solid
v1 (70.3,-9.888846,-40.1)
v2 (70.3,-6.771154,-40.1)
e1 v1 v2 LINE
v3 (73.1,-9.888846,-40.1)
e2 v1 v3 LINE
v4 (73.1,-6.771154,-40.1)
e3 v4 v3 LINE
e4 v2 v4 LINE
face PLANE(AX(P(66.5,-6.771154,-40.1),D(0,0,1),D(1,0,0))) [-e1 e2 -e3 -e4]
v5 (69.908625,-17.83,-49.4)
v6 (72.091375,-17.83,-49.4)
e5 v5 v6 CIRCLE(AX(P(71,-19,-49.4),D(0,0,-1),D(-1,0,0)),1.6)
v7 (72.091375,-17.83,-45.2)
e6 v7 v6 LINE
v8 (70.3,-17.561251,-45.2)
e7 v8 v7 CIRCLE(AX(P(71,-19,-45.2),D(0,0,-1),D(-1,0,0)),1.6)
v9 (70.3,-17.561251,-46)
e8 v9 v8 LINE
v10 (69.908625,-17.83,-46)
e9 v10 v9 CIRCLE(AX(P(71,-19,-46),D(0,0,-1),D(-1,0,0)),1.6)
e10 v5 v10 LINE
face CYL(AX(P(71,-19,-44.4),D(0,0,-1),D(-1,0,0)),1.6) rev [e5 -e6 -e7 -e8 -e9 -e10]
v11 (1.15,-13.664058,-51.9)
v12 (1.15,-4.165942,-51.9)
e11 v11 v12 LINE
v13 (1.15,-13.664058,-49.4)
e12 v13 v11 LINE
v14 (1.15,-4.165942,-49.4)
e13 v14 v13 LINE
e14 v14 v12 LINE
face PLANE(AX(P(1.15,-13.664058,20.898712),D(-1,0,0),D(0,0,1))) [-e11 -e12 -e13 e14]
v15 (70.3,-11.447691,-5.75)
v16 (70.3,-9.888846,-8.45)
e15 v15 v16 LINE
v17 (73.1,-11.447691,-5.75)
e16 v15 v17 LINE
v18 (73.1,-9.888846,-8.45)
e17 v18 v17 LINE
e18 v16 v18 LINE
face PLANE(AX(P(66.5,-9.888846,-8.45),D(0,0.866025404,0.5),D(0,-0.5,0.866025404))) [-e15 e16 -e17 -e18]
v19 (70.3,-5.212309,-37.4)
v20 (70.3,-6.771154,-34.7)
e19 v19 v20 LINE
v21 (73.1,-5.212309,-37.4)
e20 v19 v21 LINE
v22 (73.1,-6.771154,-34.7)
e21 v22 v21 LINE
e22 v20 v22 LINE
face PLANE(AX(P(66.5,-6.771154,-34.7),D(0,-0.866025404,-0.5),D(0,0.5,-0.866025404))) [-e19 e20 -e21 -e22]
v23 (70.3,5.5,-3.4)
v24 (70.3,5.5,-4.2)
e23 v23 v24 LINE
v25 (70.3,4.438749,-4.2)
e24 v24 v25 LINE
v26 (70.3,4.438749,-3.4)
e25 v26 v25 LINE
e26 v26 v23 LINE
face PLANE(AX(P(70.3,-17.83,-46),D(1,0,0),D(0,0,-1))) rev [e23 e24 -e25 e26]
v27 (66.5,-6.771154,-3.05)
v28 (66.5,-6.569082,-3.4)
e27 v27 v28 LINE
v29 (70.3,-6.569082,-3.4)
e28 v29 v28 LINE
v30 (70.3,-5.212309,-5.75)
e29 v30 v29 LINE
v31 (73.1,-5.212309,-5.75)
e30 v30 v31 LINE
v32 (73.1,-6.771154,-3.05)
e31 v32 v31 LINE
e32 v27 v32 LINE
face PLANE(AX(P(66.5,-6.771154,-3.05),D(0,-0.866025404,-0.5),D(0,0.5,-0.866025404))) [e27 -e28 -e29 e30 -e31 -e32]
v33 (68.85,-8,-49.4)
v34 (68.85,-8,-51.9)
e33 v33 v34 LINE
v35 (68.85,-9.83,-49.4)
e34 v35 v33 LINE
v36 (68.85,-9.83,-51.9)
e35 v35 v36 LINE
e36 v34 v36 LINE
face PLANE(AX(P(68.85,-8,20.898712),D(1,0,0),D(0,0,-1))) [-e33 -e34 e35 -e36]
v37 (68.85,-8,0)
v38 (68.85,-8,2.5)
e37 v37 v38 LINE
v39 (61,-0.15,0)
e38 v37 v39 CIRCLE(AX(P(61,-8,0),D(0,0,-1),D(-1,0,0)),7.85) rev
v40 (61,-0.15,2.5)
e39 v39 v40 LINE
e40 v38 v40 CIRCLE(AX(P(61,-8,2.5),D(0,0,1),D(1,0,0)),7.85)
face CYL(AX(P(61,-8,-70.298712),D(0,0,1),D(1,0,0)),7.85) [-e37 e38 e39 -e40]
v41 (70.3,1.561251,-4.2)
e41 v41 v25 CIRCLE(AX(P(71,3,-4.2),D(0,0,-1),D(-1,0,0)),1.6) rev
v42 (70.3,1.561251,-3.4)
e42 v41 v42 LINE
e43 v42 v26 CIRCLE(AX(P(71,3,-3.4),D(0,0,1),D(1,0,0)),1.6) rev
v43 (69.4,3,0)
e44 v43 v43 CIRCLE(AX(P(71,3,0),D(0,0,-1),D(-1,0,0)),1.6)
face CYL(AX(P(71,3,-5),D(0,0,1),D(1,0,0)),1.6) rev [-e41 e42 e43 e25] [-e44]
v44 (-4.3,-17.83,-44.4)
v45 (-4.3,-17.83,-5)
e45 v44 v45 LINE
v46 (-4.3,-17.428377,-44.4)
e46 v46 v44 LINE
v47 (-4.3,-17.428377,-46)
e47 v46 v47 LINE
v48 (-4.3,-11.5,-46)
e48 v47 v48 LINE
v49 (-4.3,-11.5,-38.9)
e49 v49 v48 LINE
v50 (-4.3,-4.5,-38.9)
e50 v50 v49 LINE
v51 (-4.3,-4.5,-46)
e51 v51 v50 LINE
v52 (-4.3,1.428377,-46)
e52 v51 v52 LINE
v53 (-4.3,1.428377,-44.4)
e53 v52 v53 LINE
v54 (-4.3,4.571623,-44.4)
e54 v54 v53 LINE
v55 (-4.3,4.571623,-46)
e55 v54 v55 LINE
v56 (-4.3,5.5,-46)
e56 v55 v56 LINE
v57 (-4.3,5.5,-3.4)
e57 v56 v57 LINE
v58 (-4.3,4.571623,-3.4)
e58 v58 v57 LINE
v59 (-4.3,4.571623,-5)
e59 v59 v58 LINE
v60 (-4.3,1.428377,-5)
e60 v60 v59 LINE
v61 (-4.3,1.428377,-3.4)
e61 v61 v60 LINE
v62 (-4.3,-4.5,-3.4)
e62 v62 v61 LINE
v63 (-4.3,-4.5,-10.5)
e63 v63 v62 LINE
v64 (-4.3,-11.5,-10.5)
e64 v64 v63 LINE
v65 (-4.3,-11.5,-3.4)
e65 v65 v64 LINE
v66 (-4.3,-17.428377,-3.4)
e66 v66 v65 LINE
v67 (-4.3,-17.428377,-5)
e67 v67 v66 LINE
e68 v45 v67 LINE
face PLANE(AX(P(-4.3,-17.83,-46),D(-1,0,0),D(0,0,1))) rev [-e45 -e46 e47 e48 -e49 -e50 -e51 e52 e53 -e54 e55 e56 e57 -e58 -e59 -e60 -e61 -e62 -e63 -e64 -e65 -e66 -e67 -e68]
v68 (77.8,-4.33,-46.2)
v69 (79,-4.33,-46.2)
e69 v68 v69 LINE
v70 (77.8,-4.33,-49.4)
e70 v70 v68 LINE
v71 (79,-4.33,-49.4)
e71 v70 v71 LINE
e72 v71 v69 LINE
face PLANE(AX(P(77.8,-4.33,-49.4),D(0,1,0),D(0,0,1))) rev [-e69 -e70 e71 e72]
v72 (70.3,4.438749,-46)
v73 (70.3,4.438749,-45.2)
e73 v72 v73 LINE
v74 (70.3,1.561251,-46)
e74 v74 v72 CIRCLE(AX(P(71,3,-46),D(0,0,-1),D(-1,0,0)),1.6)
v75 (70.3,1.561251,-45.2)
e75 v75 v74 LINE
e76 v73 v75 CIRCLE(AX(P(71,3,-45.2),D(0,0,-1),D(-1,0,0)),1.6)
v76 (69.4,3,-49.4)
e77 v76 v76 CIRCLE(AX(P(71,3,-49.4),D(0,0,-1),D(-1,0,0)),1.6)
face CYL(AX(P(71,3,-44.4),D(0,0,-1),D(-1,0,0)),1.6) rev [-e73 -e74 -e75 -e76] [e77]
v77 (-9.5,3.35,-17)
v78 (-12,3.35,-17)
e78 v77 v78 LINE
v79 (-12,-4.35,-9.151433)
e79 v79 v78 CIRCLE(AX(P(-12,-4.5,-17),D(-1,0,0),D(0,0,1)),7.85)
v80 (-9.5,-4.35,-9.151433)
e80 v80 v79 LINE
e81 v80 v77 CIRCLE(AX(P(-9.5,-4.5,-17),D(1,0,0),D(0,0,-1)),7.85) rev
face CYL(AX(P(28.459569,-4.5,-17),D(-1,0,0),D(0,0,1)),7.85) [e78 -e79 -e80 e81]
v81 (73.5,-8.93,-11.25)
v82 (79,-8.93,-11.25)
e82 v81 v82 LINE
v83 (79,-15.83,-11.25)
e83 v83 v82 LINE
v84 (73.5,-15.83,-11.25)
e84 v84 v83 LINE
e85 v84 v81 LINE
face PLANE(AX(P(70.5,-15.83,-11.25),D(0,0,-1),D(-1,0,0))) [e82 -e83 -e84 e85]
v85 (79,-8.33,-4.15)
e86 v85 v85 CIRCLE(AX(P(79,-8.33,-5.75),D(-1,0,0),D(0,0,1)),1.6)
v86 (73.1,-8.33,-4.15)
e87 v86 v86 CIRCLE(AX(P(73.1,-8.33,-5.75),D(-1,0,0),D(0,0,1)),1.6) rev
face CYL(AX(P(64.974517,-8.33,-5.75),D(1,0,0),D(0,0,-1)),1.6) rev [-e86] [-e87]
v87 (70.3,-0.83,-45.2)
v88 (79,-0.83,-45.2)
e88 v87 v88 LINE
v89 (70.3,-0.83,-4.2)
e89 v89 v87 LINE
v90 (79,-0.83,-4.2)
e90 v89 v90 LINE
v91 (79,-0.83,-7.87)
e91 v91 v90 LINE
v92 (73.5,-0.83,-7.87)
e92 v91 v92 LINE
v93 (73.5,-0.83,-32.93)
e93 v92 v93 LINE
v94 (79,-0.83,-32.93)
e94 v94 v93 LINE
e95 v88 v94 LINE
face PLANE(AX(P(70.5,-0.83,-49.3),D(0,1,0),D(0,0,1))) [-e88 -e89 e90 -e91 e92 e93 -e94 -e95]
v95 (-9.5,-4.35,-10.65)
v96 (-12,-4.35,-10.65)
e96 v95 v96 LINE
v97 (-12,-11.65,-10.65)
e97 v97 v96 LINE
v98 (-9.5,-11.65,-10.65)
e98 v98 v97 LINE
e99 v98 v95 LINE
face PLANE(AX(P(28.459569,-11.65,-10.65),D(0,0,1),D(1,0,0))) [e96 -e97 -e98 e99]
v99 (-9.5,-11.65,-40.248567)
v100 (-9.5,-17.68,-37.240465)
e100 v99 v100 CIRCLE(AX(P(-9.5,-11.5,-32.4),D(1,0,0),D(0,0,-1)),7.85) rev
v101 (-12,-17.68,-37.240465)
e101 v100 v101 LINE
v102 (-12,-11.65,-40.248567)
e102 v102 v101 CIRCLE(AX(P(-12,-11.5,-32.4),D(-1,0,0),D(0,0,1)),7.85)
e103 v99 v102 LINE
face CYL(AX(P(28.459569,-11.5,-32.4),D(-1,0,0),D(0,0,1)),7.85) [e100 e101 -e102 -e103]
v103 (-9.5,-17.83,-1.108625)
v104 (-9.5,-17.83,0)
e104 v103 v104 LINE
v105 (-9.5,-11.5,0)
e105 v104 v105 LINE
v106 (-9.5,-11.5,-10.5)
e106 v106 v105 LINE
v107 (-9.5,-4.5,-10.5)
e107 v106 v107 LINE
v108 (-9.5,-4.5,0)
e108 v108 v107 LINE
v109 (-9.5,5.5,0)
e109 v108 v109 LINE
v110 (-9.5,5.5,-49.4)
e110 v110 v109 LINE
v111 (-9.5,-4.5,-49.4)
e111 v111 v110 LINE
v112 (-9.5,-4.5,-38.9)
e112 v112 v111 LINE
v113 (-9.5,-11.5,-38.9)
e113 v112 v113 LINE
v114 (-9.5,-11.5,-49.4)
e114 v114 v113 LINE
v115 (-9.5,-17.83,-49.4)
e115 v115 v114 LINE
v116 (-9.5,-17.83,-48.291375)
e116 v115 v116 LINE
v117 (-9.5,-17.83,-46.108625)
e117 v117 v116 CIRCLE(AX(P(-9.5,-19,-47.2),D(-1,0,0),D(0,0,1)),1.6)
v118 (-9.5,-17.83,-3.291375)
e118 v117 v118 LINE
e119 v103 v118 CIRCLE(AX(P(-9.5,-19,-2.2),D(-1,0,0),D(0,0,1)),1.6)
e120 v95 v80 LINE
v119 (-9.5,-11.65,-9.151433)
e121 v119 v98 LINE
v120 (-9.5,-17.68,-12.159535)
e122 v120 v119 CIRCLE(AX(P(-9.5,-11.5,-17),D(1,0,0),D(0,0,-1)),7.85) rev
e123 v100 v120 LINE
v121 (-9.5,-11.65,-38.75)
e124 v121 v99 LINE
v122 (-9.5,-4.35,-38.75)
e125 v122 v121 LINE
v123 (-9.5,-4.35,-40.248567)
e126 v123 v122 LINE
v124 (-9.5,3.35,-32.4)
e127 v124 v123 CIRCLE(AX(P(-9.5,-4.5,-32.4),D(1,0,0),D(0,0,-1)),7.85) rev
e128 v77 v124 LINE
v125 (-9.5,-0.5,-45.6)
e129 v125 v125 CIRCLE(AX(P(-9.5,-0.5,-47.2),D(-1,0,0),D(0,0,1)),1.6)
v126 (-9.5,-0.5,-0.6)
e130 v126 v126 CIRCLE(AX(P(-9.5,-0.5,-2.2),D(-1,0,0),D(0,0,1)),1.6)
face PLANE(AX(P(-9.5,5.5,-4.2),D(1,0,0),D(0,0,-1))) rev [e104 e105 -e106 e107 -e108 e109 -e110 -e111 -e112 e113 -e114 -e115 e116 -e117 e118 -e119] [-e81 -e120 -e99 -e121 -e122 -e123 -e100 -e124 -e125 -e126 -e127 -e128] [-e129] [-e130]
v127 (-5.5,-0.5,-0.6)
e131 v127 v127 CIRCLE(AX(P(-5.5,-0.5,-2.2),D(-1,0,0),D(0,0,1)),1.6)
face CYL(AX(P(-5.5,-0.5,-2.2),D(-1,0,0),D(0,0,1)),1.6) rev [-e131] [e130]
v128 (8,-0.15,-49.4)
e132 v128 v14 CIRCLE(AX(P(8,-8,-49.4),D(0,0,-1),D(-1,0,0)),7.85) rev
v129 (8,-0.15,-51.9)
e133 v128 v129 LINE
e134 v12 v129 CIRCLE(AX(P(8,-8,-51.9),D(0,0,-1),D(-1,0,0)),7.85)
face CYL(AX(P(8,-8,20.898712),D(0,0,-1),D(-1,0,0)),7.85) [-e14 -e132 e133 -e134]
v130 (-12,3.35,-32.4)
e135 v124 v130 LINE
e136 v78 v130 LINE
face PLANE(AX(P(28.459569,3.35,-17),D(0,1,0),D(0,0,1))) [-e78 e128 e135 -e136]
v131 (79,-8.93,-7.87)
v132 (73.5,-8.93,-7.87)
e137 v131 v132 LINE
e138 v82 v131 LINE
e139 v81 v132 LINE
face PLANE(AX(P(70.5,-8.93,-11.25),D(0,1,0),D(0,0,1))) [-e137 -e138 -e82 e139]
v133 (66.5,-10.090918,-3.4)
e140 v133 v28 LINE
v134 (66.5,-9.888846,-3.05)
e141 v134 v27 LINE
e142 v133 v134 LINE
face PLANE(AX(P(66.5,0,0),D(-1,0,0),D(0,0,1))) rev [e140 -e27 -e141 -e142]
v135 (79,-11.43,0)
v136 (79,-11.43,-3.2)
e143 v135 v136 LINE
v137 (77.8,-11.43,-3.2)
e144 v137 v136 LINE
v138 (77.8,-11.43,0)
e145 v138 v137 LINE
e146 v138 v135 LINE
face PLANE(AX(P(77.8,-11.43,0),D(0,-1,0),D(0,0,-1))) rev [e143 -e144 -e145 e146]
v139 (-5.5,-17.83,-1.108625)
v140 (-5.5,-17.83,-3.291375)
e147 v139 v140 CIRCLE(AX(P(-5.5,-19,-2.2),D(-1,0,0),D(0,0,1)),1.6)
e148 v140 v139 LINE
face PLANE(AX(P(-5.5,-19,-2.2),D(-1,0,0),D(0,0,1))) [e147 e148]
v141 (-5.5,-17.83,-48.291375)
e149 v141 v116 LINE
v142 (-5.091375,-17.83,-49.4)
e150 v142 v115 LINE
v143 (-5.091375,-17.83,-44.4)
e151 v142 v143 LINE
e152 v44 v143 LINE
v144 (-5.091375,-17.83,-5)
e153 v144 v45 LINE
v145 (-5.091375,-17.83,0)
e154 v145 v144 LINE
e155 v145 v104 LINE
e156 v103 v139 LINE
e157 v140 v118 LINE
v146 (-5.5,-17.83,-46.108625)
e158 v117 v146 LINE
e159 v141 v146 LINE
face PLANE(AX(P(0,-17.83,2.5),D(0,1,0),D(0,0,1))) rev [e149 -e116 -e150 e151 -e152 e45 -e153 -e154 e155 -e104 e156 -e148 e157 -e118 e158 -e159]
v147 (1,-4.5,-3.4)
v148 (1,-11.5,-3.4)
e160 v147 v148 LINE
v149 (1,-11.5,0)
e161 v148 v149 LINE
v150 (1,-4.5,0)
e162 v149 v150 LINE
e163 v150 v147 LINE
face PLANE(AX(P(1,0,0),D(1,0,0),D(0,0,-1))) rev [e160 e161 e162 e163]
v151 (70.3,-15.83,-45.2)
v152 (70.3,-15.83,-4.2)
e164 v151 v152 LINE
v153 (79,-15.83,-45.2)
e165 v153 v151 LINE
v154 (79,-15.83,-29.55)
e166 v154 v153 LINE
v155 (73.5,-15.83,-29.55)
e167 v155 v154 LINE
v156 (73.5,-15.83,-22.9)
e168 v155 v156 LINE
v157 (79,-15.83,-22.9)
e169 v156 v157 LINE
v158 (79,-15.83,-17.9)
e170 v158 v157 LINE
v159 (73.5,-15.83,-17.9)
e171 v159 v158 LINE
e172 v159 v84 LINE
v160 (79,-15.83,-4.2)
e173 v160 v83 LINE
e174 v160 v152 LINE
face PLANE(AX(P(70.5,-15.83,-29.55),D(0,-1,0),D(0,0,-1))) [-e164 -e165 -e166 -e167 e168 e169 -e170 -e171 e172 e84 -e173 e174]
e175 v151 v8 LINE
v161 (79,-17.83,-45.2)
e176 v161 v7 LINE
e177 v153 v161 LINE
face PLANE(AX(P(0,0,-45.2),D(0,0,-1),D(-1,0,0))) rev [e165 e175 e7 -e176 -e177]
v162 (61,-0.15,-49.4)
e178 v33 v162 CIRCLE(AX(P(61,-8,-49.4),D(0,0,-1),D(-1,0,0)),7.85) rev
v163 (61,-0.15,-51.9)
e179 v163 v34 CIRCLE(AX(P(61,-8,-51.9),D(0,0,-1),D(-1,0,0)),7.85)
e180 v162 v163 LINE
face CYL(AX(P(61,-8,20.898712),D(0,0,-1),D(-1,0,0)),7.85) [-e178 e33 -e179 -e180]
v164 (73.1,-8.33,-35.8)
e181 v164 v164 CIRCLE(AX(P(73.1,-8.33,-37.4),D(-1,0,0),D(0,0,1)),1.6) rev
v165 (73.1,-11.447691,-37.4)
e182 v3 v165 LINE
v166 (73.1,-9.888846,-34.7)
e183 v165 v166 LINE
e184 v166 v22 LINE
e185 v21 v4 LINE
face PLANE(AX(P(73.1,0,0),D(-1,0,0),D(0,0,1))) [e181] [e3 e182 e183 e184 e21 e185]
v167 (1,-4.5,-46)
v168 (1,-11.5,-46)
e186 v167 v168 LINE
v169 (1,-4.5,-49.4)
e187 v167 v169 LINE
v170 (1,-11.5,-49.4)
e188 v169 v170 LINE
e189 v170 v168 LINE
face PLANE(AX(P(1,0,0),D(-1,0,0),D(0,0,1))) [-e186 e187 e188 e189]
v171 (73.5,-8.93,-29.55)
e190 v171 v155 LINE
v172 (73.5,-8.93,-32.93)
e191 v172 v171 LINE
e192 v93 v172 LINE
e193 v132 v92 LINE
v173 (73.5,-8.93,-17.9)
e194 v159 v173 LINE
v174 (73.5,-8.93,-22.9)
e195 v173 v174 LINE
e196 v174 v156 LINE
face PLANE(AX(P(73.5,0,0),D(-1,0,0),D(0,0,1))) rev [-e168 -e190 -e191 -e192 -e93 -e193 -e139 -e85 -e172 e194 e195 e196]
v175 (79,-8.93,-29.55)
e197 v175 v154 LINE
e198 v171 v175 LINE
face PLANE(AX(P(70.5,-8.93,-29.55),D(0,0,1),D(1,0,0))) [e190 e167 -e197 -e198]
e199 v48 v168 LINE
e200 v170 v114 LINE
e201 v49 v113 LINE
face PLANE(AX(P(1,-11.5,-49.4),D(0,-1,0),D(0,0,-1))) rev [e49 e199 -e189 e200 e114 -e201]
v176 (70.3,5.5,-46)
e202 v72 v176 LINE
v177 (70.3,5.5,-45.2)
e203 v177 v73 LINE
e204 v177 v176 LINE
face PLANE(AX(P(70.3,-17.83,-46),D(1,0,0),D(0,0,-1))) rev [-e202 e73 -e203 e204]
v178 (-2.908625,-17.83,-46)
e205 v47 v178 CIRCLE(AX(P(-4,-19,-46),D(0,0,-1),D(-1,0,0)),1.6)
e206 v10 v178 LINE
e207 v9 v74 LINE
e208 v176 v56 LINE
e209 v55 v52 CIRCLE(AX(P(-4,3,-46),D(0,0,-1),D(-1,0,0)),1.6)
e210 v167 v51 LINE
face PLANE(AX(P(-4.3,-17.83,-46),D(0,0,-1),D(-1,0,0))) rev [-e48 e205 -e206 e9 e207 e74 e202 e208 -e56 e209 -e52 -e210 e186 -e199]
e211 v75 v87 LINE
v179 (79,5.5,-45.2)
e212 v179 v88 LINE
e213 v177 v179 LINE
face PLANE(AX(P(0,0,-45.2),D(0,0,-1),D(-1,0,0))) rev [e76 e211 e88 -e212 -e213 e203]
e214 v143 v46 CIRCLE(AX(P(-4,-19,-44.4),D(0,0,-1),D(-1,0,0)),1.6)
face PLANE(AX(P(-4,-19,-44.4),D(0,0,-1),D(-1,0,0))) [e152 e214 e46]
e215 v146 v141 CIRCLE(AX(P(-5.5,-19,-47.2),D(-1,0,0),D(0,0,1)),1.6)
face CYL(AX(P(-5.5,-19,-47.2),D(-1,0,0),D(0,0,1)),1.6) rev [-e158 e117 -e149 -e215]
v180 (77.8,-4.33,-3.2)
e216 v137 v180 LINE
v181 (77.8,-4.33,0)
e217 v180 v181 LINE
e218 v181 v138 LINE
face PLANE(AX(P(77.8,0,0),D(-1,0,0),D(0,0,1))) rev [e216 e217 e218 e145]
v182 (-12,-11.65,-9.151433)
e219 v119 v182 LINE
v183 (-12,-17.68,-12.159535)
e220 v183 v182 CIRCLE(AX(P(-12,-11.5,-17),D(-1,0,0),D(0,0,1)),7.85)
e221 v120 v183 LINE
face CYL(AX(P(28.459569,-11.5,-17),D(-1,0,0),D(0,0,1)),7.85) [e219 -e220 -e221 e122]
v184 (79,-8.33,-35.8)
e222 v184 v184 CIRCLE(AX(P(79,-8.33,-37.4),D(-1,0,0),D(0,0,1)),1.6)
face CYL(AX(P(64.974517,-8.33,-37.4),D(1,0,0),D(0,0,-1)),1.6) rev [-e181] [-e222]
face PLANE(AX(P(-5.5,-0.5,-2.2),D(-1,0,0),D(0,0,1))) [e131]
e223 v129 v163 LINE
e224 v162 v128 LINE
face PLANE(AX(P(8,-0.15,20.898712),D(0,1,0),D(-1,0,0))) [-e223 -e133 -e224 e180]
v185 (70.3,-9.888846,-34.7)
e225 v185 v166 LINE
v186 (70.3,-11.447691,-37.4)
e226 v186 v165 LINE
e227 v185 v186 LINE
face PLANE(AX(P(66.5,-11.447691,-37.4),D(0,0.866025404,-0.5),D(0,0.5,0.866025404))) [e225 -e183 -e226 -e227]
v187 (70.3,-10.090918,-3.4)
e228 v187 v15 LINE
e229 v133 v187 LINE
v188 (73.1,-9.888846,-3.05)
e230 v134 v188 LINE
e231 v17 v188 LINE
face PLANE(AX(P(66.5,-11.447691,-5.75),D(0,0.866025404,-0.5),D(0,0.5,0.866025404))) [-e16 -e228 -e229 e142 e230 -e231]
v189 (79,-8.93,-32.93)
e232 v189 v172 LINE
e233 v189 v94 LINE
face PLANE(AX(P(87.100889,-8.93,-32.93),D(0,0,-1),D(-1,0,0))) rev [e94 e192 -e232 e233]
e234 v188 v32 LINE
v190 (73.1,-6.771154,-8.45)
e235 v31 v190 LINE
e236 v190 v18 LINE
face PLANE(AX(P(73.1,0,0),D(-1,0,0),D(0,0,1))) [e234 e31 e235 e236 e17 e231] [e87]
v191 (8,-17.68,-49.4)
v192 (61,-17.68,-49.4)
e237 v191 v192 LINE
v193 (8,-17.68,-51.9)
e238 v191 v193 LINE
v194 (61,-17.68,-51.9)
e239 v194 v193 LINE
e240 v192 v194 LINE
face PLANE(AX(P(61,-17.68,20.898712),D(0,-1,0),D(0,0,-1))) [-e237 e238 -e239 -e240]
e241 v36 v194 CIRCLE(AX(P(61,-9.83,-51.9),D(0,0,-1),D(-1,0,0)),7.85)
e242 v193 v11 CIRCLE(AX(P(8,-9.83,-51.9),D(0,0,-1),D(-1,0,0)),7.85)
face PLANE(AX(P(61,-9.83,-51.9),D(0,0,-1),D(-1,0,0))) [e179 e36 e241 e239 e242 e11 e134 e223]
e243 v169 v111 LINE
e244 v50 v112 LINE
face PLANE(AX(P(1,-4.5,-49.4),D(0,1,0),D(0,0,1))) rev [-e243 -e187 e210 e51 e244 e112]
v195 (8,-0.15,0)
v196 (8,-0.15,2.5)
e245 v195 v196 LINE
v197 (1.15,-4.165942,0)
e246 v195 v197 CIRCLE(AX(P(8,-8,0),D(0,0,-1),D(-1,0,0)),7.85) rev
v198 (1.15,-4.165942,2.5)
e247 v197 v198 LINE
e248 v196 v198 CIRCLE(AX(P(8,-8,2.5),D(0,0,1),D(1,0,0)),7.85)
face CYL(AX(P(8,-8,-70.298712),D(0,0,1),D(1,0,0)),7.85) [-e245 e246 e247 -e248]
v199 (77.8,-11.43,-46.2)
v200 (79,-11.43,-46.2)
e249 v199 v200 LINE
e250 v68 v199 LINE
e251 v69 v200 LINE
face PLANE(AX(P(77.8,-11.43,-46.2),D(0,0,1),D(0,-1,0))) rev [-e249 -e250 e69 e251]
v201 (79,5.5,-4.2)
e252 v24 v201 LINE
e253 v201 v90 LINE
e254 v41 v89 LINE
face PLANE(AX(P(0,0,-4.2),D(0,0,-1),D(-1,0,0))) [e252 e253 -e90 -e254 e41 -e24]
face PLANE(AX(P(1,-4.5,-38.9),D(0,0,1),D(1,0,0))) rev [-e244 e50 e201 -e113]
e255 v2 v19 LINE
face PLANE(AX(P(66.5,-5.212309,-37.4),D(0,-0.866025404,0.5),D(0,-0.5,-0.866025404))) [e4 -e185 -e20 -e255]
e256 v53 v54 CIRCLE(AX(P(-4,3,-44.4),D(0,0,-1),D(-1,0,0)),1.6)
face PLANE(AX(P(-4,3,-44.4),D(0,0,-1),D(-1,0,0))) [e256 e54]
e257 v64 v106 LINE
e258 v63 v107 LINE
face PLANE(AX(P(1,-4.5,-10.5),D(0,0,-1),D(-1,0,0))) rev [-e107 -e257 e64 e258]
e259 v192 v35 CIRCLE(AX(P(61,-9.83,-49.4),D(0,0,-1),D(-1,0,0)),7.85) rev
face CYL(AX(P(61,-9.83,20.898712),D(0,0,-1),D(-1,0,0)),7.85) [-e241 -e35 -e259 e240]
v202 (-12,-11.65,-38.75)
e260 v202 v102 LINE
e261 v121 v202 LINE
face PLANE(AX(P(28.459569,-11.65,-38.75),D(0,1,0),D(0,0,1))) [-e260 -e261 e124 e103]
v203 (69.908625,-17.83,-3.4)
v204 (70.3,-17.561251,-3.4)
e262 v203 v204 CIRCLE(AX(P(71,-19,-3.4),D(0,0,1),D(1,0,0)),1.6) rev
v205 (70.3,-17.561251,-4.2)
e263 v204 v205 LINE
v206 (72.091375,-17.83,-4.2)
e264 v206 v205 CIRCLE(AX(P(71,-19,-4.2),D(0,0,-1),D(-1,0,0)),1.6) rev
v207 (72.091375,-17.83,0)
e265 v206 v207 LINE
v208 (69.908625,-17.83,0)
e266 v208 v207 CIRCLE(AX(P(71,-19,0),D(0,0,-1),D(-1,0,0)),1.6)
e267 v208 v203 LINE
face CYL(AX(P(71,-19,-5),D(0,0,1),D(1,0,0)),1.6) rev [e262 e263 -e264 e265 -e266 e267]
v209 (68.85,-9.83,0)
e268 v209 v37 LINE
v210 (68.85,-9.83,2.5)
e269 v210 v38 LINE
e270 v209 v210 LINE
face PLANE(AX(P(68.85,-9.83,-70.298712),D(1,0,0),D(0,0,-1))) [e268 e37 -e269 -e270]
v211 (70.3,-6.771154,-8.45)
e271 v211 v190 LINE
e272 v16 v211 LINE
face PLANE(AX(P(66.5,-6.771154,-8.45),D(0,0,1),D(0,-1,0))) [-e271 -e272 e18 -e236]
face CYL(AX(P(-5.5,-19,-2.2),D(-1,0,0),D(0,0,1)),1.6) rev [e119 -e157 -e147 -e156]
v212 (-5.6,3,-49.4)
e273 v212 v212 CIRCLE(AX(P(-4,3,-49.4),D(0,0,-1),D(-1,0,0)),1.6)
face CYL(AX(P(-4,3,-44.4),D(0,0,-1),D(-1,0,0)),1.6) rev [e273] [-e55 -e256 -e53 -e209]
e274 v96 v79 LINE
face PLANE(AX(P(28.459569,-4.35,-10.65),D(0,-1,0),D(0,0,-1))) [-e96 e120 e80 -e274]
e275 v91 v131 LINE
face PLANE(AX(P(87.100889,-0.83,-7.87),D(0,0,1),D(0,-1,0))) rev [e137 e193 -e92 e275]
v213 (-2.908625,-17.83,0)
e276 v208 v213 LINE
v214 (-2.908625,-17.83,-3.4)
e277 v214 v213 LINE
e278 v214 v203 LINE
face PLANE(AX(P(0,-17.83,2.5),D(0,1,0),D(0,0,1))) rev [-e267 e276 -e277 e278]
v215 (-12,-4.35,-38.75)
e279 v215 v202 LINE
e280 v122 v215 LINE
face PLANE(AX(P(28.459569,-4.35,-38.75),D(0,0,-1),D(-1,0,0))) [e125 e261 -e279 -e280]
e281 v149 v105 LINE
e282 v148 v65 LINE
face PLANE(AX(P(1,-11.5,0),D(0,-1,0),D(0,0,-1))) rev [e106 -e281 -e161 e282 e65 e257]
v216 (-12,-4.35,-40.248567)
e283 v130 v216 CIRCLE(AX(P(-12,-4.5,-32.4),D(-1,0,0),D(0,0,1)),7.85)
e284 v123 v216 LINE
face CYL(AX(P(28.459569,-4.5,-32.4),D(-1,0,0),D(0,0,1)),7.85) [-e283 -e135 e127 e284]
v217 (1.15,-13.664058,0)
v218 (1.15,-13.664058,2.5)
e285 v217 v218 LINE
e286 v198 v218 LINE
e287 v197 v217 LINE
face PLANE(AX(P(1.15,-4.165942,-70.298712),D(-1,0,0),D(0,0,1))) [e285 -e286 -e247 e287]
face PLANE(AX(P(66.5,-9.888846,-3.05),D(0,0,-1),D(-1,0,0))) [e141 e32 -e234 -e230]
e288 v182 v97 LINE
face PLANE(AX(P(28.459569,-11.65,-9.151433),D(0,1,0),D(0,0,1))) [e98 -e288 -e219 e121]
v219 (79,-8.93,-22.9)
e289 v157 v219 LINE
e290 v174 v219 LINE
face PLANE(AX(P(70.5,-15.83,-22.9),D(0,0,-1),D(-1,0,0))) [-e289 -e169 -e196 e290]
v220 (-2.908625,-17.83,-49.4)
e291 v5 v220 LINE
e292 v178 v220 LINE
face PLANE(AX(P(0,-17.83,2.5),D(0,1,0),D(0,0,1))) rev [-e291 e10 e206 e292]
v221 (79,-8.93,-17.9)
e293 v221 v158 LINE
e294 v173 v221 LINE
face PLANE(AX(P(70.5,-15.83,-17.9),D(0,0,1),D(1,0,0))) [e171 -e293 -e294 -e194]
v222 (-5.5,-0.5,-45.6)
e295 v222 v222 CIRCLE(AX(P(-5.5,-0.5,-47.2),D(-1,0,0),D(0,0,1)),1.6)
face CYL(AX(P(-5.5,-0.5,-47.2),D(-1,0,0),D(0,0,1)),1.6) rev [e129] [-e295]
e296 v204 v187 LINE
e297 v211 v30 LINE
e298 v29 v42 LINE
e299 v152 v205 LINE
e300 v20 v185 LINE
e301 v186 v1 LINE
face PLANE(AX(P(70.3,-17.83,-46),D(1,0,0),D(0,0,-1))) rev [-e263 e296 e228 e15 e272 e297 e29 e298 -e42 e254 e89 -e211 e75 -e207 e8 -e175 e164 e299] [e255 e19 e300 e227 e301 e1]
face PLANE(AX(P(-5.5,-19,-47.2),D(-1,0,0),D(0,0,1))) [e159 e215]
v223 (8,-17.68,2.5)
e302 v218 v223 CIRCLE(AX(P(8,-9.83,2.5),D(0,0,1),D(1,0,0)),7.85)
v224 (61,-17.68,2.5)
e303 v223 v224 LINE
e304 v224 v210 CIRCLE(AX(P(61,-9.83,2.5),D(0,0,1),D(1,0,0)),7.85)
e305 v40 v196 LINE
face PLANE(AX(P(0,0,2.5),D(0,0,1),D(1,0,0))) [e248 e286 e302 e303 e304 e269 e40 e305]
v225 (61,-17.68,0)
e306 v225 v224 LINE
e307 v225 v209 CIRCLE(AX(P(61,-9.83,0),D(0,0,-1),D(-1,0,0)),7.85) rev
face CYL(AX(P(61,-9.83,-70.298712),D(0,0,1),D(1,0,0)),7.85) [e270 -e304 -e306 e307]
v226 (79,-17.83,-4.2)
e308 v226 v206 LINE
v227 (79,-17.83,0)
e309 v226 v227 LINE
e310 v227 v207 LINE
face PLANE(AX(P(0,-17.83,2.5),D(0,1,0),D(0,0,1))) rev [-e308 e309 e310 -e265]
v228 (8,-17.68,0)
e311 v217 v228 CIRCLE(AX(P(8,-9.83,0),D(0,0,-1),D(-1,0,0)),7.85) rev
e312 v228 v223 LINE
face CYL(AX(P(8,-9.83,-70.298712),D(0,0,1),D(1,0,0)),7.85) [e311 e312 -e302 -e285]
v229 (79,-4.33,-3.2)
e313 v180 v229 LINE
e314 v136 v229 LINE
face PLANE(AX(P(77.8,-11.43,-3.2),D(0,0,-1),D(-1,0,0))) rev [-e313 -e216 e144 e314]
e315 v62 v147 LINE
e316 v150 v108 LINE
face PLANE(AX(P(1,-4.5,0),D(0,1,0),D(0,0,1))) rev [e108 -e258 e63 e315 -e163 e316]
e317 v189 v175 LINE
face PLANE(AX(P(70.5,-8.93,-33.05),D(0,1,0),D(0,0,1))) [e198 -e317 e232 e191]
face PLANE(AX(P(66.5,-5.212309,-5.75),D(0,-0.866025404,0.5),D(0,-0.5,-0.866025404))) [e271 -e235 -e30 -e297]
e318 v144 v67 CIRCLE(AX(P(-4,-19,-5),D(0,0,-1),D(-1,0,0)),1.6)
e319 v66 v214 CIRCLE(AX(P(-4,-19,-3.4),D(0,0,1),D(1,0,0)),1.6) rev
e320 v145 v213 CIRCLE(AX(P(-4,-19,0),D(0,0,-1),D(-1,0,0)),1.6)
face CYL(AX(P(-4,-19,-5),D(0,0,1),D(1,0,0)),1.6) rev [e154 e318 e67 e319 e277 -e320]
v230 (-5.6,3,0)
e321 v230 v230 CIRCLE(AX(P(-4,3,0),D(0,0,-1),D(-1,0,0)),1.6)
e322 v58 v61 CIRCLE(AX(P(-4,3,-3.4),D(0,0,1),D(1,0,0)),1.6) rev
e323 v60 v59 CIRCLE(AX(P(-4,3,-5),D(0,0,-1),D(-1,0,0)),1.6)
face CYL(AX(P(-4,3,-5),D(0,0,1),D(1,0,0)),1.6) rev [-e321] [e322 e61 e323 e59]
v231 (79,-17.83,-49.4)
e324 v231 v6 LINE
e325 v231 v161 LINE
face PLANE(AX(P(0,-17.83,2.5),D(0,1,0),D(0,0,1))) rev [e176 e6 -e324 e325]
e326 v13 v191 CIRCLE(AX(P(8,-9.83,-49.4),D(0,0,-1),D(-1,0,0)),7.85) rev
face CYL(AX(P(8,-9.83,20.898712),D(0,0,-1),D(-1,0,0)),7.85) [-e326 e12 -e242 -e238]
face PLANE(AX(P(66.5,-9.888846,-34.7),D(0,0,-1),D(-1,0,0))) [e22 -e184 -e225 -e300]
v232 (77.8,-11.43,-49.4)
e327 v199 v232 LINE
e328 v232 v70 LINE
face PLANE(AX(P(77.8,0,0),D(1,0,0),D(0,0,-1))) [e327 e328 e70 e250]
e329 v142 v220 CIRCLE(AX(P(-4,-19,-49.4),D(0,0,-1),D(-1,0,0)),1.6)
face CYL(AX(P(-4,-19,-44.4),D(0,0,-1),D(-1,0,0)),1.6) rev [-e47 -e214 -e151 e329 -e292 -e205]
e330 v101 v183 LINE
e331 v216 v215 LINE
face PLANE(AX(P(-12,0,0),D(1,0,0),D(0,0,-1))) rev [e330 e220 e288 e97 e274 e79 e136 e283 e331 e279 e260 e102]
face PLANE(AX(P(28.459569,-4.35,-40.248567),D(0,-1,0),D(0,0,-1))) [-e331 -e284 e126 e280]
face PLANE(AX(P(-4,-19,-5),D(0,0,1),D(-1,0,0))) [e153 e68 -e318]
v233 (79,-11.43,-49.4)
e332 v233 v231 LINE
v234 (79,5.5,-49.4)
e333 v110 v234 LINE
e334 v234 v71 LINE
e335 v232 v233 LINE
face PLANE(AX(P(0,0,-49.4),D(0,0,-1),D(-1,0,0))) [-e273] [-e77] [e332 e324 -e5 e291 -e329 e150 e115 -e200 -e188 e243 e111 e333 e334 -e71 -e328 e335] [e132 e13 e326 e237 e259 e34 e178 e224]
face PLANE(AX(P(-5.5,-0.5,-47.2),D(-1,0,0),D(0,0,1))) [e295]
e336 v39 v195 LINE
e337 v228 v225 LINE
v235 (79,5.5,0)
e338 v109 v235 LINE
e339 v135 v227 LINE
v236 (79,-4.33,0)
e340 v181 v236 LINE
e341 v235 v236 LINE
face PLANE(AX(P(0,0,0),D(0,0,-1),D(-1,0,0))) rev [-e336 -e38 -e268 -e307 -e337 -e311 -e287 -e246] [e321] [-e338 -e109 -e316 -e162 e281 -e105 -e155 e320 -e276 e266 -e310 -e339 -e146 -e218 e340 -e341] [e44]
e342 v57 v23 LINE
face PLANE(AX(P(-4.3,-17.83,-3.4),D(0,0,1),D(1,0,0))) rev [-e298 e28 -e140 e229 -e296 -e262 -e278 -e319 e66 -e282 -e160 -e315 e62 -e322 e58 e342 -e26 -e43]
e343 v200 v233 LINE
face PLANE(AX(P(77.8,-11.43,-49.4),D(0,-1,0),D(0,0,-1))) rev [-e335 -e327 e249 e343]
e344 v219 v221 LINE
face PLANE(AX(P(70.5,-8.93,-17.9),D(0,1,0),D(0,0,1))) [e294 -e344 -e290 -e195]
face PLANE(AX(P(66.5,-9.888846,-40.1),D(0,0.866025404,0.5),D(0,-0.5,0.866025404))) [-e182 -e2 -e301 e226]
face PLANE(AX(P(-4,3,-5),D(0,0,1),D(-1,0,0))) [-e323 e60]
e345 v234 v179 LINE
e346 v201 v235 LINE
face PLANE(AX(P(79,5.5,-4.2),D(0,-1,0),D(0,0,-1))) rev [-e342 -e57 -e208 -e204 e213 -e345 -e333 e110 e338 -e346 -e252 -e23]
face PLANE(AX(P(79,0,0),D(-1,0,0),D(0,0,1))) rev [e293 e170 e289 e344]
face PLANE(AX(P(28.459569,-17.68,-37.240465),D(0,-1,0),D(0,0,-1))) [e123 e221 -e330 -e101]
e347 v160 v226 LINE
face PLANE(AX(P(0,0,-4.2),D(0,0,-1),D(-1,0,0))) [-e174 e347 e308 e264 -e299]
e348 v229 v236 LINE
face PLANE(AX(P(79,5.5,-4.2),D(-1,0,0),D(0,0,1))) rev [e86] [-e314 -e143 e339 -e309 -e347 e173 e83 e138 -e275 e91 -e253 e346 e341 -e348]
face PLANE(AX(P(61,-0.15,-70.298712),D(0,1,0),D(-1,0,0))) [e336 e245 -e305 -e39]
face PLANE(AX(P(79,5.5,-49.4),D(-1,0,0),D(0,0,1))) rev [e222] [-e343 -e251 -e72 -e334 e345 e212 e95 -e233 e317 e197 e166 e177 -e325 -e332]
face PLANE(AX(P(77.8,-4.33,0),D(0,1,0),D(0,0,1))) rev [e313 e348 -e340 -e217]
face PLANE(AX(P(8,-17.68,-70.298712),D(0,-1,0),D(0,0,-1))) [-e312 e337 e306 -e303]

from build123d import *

# Parameters (mm, degrees)
SKETCH_2_W               = 69
SKETCH_2_H               = 17.83
EXTRUDE_1_DEPTH          = 2.5
FILLET_1_R               = 8
SKETCH_3_W               = 88.5
SKETCH_3_H               = 23.33
EXTRUDE_2_DEPTH          = 4.2
SKETCH_4_W               = 41
SKETCH_4_H               = 23.33
EXTRUDE_3_DEPTH          = 6
SKETCH_5_W               = 88.5
SKETCH_5_H               = 23.33
EXTRUDE_4_DEPTH          = 4.2
EXTRUDE_5_DEPTH          = 2.5
SKETCH_7_W               = 10.5
SKETCH_7_H               = 7
CUT_EXTRUDE_1_DEPTH      = 10.5
SKETCH_9_W               = 31.4
SKETCH_9_H               = 23
EXTRUDE_6_DEPTH          = 2.5
FILLET_3_R               = 8
SKETCH_11_W              = 5
SKETCH_11_H              = 6.9
EXTRUDE_7_DEPTH          = 8.5
SKETCH_13_W              = 41
SKETCH_13_H              = 15
EXTRUDE_8_DEPTH          = 3
SKETCH_12_W              = 3.2
SKETCH_12_H              = 7.1
CUT_EXTRUDE_3_DEPTH      = 1.2
SKETCH_10_W              = 1.5
SKETCH_10_H              = 7
CUT_EXTRUDE_4_DEPTH      = 5
CUT_EXTRUDE_5_DEPTH      = 97.190014555
CUT_EXTRUDE_5_DEPTH_BACK = 97.190014555
CUT_EXTRUDE_6_DEPTH      = 97.039627238
CUT_EXTRUDE_6_DEPTH_BACK = 97.039627238
SKETCH_15_W              = 0.823752297
SKETCH_15_H              = 2.5
SKETCH_18_W              = 41
SKETCH_18_H              = 15
EXTRUDE_10_DEPTH         = 1
CUT_EXTRUDE_7_DEPTH      = 107.266264167
CUT_EXTRUDE_7_DEPTH_BACK = 9.5
SKETCH_16_R              = 1.6
CUT_EXTRUDE_8_DEPTH      = 3
CUT_EXTRUDE_8_DEPTH_BACK = 3.6
CUT_EXTRUDE_9_DEPTH      = 2.5
CUT_EXTRUDE_10_DEPTH     = 2.5
SKETCH_22_W              = 0.12
SKETCH_22_H              = 8.1
EXTRUDE_11_DEPTH         = 5.5
CUT_EXTRUDE_14_DEPTH     = 2.5
SKETCH_24_W              = 74.6
SKETCH_24_H              = 42.6
SKETCH_24_W_2            = 73
SKETCH_24_H_2            = 41
CUT_EXTRUDE_15_DEPTH     = 98.359636914
SKETCH_25_R              = 1.6
CUT_EXTRUDE_17_DEPTH     = 5
SKETCH_26_R              = 1.6
CUT_EXTRUDE_18_DEPTH     = 4


with BuildPart() as part:
    # 草图2 → 凸台-拉伸1 (new body)
    with BuildSketch(Plane.XY):
        with Locations((34.5, -8.915)):
            Rectangle(SKETCH_2_W, SKETCH_2_H)
    extrude(amount=EXTRUDE_1_DEPTH)

    # 圆角1
    fillet_1_edges = [part.edges().sort_by_distance(p)[0] for p in [
        (0, 0, 1.25),
        (69, 0, 1.25),
        (69, -17.83, 1.25),
        (0, -17.83, 1.25),
    ]]
    fillet(fillet_1_edges, radius=FILLET_1_R)

    # 草图3 → 凸台-拉伸2 (add)
    with BuildSketch(Plane(origin=(0, 0, 0), x_dir=(-1, 0, 0), z_dir=(0, 0, -1))):
        with Locations((-34.75, -6.165)):
            Rectangle(SKETCH_3_W, SKETCH_3_H)
    extrude(amount=EXTRUDE_2_DEPTH)

    # 草图4 → 凸台-拉伸3 (add)
    with BuildSketch(Plane.ZY.offset(9.5)):
        with Locations((-24.7, -6.165)):
            Rectangle(SKETCH_4_W, SKETCH_4_H)
    extrude(amount=-EXTRUDE_3_DEPTH)

    # 草图5 → 凸台-拉伸4 (add)
    with BuildSketch(Plane(origin=(0, 0, -45.2), x_dir=(-1, 0, 0), z_dir=(0, 0, -1))):
        with Locations((-34.75, -6.165)):
            Rectangle(SKETCH_5_W, SKETCH_5_H)
    extrude(amount=EXTRUDE_4_DEPTH)

    # 草图6 → 凸台-拉伸5 (add)
    with BuildSketch(Plane(origin=(0, 0, -49.4), x_dir=(-1, 0, 0), z_dir=(0, 0, -1))):
        with BuildLine():
            Line((-69, -8), (-69, -9.83))
            ThreePointArc((-69, -9.83), (-66.656854249, -15.486854249), (-61, -17.83))
            Line((-61, -17.83), (-8, -17.83))
            ThreePointArc((-8, -17.83), (-2.343145751, -15.486854249), (0, -9.83))
            Line((0, -9.83), (0, -8))
            ThreePointArc((0, -8), (-2.343145751, -2.343145751), (-8, 0))
            Line((-8, 0), (-61, 0))
            ThreePointArc((-61, 0), (-66.656854249, -2.343145751), (-69, -8))
        make_face()
    extrude(amount=EXTRUDE_5_DEPTH)

    # 草图7 → 切除-拉伸1 (cut)
    with BuildSketch(Plane.ZY.offset(9.5)):
        with Locations((-44.15, -8)):
            Rectangle(SKETCH_7_W, SKETCH_7_H)
        with Locations((-5.25, -8)):
            Rectangle(SKETCH_7_W, SKETCH_7_H)
    extrude(amount=-CUT_EXTRUDE_1_DEPTH, mode=Mode.SUBTRACT)

    # 草图9 → 凸台-拉伸6 (add)
    with BuildSketch(Plane.ZY.offset(9.5)):
        with Locations((-24.7, -8)):
            Rectangle(SKETCH_9_W, SKETCH_9_H)
    extrude(amount=EXTRUDE_6_DEPTH)

    # 圆角3
    # the kernel refuses this fillet: 8 mm, written as the material it takes off along each edge
    with BuildSketch(Plane(origin=(-9.5, -19.5, -9), x_dir=(0, 1, 0), z_dir=(-1, 0, 0))) as fillet_3_piece_1:
        with BuildLine():
            CenterArc((FILLET_3_R, FILLET_3_R), FILLET_3_R, 180, 90)
            Line((0, FILLET_3_R), (0, 0))
            Line((0, 0), (FILLET_3_R, 0))
        make_face()
    extrude(amount=22.5, mode=Mode.SUBTRACT)
    with BuildSketch(Plane(origin=(-9.5, 3.5, -9), x_dir=(0, -1, 0), z_dir=(-1, 0, 0)), Plane(origin=(-9.5, 3.5, -40.4), x_dir=(0, 0, 1), z_dir=(-1, 0, 0)), Plane(origin=(-9.5, -19.5, -40.4), x_dir=(0, 1, 0), z_dir=(-1, 0, 0))) as fillet_3_piece_2:
        with BuildLine():
            CenterArc((FILLET_3_R, -FILLET_3_R), FILLET_3_R, 90, 90)
            Line((0, -FILLET_3_R), (0, 0))
            Line((0, 0), (FILLET_3_R, 0))
        make_face()
    extrude(amount=22.5, mode=Mode.SUBTRACT)

    # 草图11 → 凸台-拉伸7 (add)
    with BuildSketch(Plane(origin=(79, 0, 0), x_dir=(0, 0, -1), z_dir=(1, 0, 0))):
        Polygon((49.3, -0.83), (33.05, -0.83), (33.05, -8.93), (29.55, -8.93), (29.55, -15.83), (49.3, -15.83), align=None)
        Polygon((0, -15.83), (11.25, -15.83), (11.25, -8.93), (7.75, -8.93), (7.75, -0.83), (0, -0.83), align=None)
        with Locations((20.4, -12.38)):
            Rectangle(SKETCH_11_W, SKETCH_11_H)
    extrude(amount=-EXTRUDE_7_DEPTH)


with BuildPart() as extrude_7_piece_1:
    # of the separate pieces the step leaves, piece 1, a body of its own (extrude_7_pieces)
    add(part.part.solids().sort_by_distance((79, 5.5, 0))[0])



with BuildPart() as extrude_7_piece_2:
    # of the separate pieces the step leaves, piece 2, a body of its own (extrude_7_pieces)
    add(part.part.solids().sort_by_distance((79, -15.83, -17.9))[0])


with BuildPart() as extrude_7_piece_1_1:
    add(extrude_7_piece_1.part)

    add(extrude_7_piece_2.part)  # 凸台-拉伸8 merges 凸台-拉伸7 piece 2
    # 草图13 → 凸台-拉伸8 (add)
    with BuildSketch(Plane.ZY.offset(-70.5)):
        with Locations((-24.7, -8.33)):
            Rectangle(SKETCH_13_W, SKETCH_13_H)
    extrude(amount=-EXTRUDE_8_DEPTH)

    # 草图12 → 切除-拉伸3 (cut)
    with BuildSketch(Plane(origin=(79, 0, 0), x_dir=(0, 0, -1), z_dir=(1, 0, 0))):
        with Locations((1.6, -7.88)):
            Rectangle(SKETCH_12_W, SKETCH_12_H)
        with Locations((47.8, -7.88)):
            Rectangle(SKETCH_12_W, SKETCH_12_H)
    extrude(amount=-CUT_EXTRUDE_3_DEPTH, mode=Mode.SUBTRACT)

    # 草图10 → 切除-拉伸4 (cut)
    with BuildSketch(Plane(origin=(-9.5, 0, 0), x_dir=(0, 0, -1), z_dir=(1, 0, 0))):
        with BuildLine():
            Line((37.291942355, -17.83), (12.108057645, -17.83))
            ThreePointArc((12.108057645, -17.83), (14.415430403, -19.070997292), (17, -19.5))
            Line((17, -19.5), (32.4, -19.5))
            ThreePointArc((32.4, -19.5), (34.984569597, -19.070997292), (37.291942355, -17.83))
        make_face()
        with Locations((39.65, -8)):
            Rectangle(SKETCH_10_W, SKETCH_10_H)
        with Locations((9.75, -8)):
            Rectangle(SKETCH_10_W, SKETCH_10_H)
    extrude(amount=-CUT_EXTRUDE_4_DEPTH, mode=Mode.SUBTRACT)

    # 草图14 → 切除-拉伸5 (cut, two sides: drawn at the far end of the back side and taken through both)
    with BuildSketch(Plane.XY.offset(-49.4).offset(-CUT_EXTRUDE_5_DEPTH_BACK)):
        with BuildLine():
            Line((0.176247703, -11.5), (1, -11.5))
            Line((1, -11.5), (1, -4.5))
            Line((1, -4.5), (0.806252715, -4.5))
            ThreePointArc((0.806252715, -4.5), (0.204168477, -6.204168477), (0, -8))
            Line((0, -8), (0, -9.83))
            ThreePointArc((0, -9.83), (0.04418394, -10.669637311), (0.176247703, -11.5))
        make_face()
    extrude(amount=CUT_EXTRUDE_5_DEPTH + CUT_EXTRUDE_5_DEPTH_BACK, mode=Mode.SUBTRACT)

    # 草图15 → 切除-拉伸6 (cut, two sides: drawn at the far end of the back side and taken through both)
    with BuildSketch(Plane(origin=(0, -11.5, 0), x_dir=(1, 0, 0), z_dir=(0, 1, 0)).offset(-CUT_EXTRUDE_6_DEPTH_BACK)):
        with Locations((0.588123852, 50.65)):
            Rectangle(SKETCH_15_W, SKETCH_15_H)
        with Locations((0.588123852, -1.25)):
            Rectangle(SKETCH_15_W, SKETCH_15_H)
    extrude(amount=CUT_EXTRUDE_6_DEPTH + CUT_EXTRUDE_6_DEPTH_BACK, mode=Mode.SUBTRACT)

    # 草图18 → 凸台-拉伸10 (add)
    with BuildSketch(Plane.ZY.offset(-70.5)):
        with Locations((-24.7, -8.33)):
            Rectangle(SKETCH_18_W, SKETCH_18_H)
    extrude(amount=EXTRUDE_10_DEPTH)

    # 草图16 → 切除-拉伸7 (cut, two sides: drawn at the far end of the back side and taken through both)
    with BuildSketch(Plane(origin=(79, 0, 0), x_dir=(0, 0, -1), z_dir=(1, 0, 0)).offset(-CUT_EXTRUDE_7_DEPTH_BACK)):
        with Locations(Location((37.4, -8.33, 0), (0, 0, 180))):
            Circle(SKETCH_16_R)
        with Locations(Location((5.75, -8.33, 0), (0, 0, 165.638488437))):
            Circle(SKETCH_16_R)
    extrude(amount=CUT_EXTRUDE_7_DEPTH + CUT_EXTRUDE_7_DEPTH_BACK, mode=Mode.SUBTRACT)

    # 草图19 → 切除-拉伸8 (cut, two sides: drawn at the far end of the back side and taken through both)
    with BuildSketch(Plane.ZY.offset(-69.5).offset(-CUT_EXTRUDE_8_DEPTH_BACK)):
        Polygon((-37.4, -5.212308546), (-40.1, -6.771154273), (-40.1, -9.888845727), (-37.4, -11.447691454), (-34.7, -9.888845727), (-34.7, -6.771154273), align=None)
        Polygon((-5.75, -5.212308546), (-8.45, -6.771154273), (-8.45, -9.888845727), (-5.75, -11.447691454), (-3.05, -9.888845727), (-3.05, -6.771154273), align=None)
    extrude(amount=CUT_EXTRUDE_8_DEPTH + CUT_EXTRUDE_8_DEPTH_BACK, mode=Mode.SUBTRACT)

    # 草图20 → 切除-拉伸9 (cut)
    with BuildSketch(Plane.XY.offset(2.5)):
        with BuildLine():
            Line((1, -4.127016654), (1, -13.702983346))
            ThreePointArc((1, -13.702983346), (3.936987987, -16.721439137), (8, -17.83))
            Line((8, -17.83), (61, -17.83))
            ThreePointArc((61, -17.83), (66.656854249, -15.486854249), (69, -9.83))
            Line((69, -9.83), (69, -8))
            ThreePointArc((69, -8), (66.656854249, -2.343145751), (61, 0))
            Line((61, 0), (8, 0))
            ThreePointArc((8, 0), (3.936987987, -1.108560863), (1, -4.127016654))
        make_face()
        with BuildLine():
            Line((1.15, -4.165942097), (1.15, -13.664057903))
            ThreePointArc((1.15, -13.664057903), (4.029789334, -16.601995811), (8, -17.68))
            Line((8, -17.68), (61, -17.68))
            ThreePointArc((61, -17.68), (66.550788232, -15.380788232), (68.85, -9.83))
            Line((68.85, -9.83), (68.85, -8))
            ThreePointArc((68.85, -8), (66.550788232, -2.449211768), (61, -0.15))
            Line((61, -0.15), (8, -0.15))
            ThreePointArc((8, -0.15), (4.029789334, -1.228004189), (1.15, -4.165942097))
        make_face(mode=Mode.SUBTRACT)
    extrude(amount=-CUT_EXTRUDE_9_DEPTH, mode=Mode.SUBTRACT)

    # 草图21 → 切除-拉伸10 (cut)
    with BuildSketch(Plane(origin=(0, 0, -51.9), x_dir=(-1, 0, 0), z_dir=(0, 0, -1))):
        with BuildLine():
            Line((-1, -13.702983346), (-1, -4.127016654))
            ThreePointArc((-1, -4.127016654), (-3.936987987, -1.108560863), (-8, 0))
            Line((-8, 0), (-61, 0))
            ThreePointArc((-61, 0), (-66.656854249, -2.343145751), (-69, -8))
            Line((-69, -8), (-69, -9.83))
            ThreePointArc((-69, -9.83), (-66.656854249, -15.486854249), (-61, -17.83))
            Line((-61, -17.83), (-8, -17.83))
            ThreePointArc((-8, -17.83), (-3.936987987, -16.721439137), (-1, -13.702983346))
        make_face()
        with BuildLine():
            Line((-1.15, -13.664057903), (-1.15, -4.165942097))
            ThreePointArc((-1.15, -4.165942097), (-4.029789334, -1.228004189), (-8, -0.15))
            Line((-8, -0.15), (-61, -0.15))
            ThreePointArc((-61, -0.15), (-66.550788232, -2.449211768), (-68.85, -8))
            Line((-68.85, -8), (-68.85, -9.83))
            ThreePointArc((-68.85, -9.83), (-66.550788232, -15.380788232), (-61, -17.68))
            Line((-61, -17.68), (-8, -17.68))
            ThreePointArc((-8, -17.68), (-4.029789334, -16.601995811), (-1.15, -13.664057903))
        make_face(mode=Mode.SUBTRACT)
    extrude(amount=-CUT_EXTRUDE_10_DEPTH, mode=Mode.SUBTRACT)

    # 草图22 → 凸台-拉伸11 (add)
    with BuildSketch(Plane(origin=(73.5, 0, 0), x_dir=(0, 0, -1), z_dir=(1, 0, 0))):
        with Locations((7.81, -4.88)):
            Rectangle(SKETCH_22_W, SKETCH_22_H)
        with Locations((32.99, -4.88)):
            Rectangle(SKETCH_22_W, SKETCH_22_H)
    extrude(amount=EXTRUDE_11_DEPTH)

    # 草图23 → 切除-拉伸14 (cut)
    with BuildSketch(Plane.ZY.offset(12)):
        with BuildLine():
            Line((-37.291942355, -17.83), (-12.108057645, -17.83))
            ThreePointArc((-12.108057645, -17.83), (-9.818929786, -15.025936837), (-9, -11.5))
            Line((-9, -11.5), (-10.5, -11.5))
            Line((-10.5, -11.5), (-10.5, -4.5))
            Line((-10.5, -4.5), (-9, -4.5))
            ThreePointArc((-9, -4.5), (-11.343145751, 1.156854249), (-17, 3.5))
            Line((-17, 3.5), (-32.4, 3.5))
            ThreePointArc((-32.4, 3.5), (-38.056854249, 1.156854249), (-40.4, -4.5))
            Line((-40.4, -4.5), (-38.9, -4.5))
            Line((-38.9, -4.5), (-38.9, -11.5))
            Line((-38.9, -11.5), (-40.4, -11.5))
            ThreePointArc((-40.4, -11.5), (-39.581070214, -15.025936837), (-37.291942355, -17.83))
        make_face()
        with BuildLine():
            Line((-37.240464854, -17.68), (-12.159535146, -17.68))
            ThreePointArc((-12.159535146, -17.68), (-9.975535198, -15.004196663), (-9.151433252, -11.65))
            Line((-9.151433252, -11.65), (-10.65, -11.65))
            Line((-10.65, -11.65), (-10.65, -4.35))
            Line((-10.65, -4.35), (-9.151433252, -4.35))
            ThreePointArc((-9.151433252, -4.35), (-11.502500568, 1.10357029), (-17, 3.35))
            Line((-17, 3.35), (-32.4, 3.35))
            ThreePointArc((-32.4, 3.35), (-37.897499432, 1.10357029), (-40.248566748, -4.35))
            Line((-40.248566748, -4.35), (-38.75, -4.35))
            Line((-38.75, -4.35), (-38.75, -11.65))
            Line((-38.75, -11.65), (-40.248566748, -11.65))
            ThreePointArc((-40.248566748, -11.65), (-39.424464802, -15.004196663), (-37.240464854, -17.68))
        make_face(mode=Mode.SUBTRACT)
    extrude(amount=-CUT_EXTRUDE_14_DEPTH, mode=Mode.SUBTRACT)

    # 草图24 → 切除-拉伸15 (cut, through all)
    with BuildSketch(Plane(origin=(0, 5.5, 0), x_dir=(1, 0, 0), z_dir=(0, 1, 0))):
        with Locations((33, 24.7)):
            Rectangle(SKETCH_24_W, SKETCH_24_H)
        with Locations((33, 24.7)):
            Rectangle(SKETCH_24_W_2, SKETCH_24_H_2, mode=Mode.SUBTRACT)
    extrude(amount=-CUT_EXTRUDE_15_DEPTH, mode=Mode.SUBTRACT)

    # 草图25 → 切除-拉伸17 (cut)
    with BuildSketch(Plane(origin=(0, 0, -49.4), x_dir=(-1, 0, 0), z_dir=(0, 0, -1))):
        with Locations((4, 3)):
            Circle(SKETCH_25_R)
        with Locations((4, -19)):
            Circle(SKETCH_25_R)
        with Locations((-71, 3)):
            Circle(SKETCH_25_R)
        with Locations((-71, -19)):
            Circle(SKETCH_25_R)
    cut_extrude_17 = extrude(amount=-CUT_EXTRUDE_17_DEPTH, mode=Mode.SUBTRACT)

    # 镜向1: 切除-拉伸17 across plane
    add(cut_extrude_17.mirror(Plane.XY.offset(-24.7)), mode=Mode.SUBTRACT)

    # 草图26 → 切除-拉伸18 (cut)
    with BuildSketch(Plane.ZY.offset(9.5)):
        with Locations((-47.2, -0.5)):
            Circle(SKETCH_26_R)
        with Locations((-2.2, -0.5)):
            Circle(SKETCH_26_R)
        with Locations((-2.2, -19)):
            Circle(SKETCH_26_R)
        with Locations((-47.2, -19)):
            Circle(SKETCH_26_R)
    extrude(amount=-CUT_EXTRUDE_18_DEPTH, mode=Mode.SUBTRACT)


solid = extrude_7_piece_1_1.part
